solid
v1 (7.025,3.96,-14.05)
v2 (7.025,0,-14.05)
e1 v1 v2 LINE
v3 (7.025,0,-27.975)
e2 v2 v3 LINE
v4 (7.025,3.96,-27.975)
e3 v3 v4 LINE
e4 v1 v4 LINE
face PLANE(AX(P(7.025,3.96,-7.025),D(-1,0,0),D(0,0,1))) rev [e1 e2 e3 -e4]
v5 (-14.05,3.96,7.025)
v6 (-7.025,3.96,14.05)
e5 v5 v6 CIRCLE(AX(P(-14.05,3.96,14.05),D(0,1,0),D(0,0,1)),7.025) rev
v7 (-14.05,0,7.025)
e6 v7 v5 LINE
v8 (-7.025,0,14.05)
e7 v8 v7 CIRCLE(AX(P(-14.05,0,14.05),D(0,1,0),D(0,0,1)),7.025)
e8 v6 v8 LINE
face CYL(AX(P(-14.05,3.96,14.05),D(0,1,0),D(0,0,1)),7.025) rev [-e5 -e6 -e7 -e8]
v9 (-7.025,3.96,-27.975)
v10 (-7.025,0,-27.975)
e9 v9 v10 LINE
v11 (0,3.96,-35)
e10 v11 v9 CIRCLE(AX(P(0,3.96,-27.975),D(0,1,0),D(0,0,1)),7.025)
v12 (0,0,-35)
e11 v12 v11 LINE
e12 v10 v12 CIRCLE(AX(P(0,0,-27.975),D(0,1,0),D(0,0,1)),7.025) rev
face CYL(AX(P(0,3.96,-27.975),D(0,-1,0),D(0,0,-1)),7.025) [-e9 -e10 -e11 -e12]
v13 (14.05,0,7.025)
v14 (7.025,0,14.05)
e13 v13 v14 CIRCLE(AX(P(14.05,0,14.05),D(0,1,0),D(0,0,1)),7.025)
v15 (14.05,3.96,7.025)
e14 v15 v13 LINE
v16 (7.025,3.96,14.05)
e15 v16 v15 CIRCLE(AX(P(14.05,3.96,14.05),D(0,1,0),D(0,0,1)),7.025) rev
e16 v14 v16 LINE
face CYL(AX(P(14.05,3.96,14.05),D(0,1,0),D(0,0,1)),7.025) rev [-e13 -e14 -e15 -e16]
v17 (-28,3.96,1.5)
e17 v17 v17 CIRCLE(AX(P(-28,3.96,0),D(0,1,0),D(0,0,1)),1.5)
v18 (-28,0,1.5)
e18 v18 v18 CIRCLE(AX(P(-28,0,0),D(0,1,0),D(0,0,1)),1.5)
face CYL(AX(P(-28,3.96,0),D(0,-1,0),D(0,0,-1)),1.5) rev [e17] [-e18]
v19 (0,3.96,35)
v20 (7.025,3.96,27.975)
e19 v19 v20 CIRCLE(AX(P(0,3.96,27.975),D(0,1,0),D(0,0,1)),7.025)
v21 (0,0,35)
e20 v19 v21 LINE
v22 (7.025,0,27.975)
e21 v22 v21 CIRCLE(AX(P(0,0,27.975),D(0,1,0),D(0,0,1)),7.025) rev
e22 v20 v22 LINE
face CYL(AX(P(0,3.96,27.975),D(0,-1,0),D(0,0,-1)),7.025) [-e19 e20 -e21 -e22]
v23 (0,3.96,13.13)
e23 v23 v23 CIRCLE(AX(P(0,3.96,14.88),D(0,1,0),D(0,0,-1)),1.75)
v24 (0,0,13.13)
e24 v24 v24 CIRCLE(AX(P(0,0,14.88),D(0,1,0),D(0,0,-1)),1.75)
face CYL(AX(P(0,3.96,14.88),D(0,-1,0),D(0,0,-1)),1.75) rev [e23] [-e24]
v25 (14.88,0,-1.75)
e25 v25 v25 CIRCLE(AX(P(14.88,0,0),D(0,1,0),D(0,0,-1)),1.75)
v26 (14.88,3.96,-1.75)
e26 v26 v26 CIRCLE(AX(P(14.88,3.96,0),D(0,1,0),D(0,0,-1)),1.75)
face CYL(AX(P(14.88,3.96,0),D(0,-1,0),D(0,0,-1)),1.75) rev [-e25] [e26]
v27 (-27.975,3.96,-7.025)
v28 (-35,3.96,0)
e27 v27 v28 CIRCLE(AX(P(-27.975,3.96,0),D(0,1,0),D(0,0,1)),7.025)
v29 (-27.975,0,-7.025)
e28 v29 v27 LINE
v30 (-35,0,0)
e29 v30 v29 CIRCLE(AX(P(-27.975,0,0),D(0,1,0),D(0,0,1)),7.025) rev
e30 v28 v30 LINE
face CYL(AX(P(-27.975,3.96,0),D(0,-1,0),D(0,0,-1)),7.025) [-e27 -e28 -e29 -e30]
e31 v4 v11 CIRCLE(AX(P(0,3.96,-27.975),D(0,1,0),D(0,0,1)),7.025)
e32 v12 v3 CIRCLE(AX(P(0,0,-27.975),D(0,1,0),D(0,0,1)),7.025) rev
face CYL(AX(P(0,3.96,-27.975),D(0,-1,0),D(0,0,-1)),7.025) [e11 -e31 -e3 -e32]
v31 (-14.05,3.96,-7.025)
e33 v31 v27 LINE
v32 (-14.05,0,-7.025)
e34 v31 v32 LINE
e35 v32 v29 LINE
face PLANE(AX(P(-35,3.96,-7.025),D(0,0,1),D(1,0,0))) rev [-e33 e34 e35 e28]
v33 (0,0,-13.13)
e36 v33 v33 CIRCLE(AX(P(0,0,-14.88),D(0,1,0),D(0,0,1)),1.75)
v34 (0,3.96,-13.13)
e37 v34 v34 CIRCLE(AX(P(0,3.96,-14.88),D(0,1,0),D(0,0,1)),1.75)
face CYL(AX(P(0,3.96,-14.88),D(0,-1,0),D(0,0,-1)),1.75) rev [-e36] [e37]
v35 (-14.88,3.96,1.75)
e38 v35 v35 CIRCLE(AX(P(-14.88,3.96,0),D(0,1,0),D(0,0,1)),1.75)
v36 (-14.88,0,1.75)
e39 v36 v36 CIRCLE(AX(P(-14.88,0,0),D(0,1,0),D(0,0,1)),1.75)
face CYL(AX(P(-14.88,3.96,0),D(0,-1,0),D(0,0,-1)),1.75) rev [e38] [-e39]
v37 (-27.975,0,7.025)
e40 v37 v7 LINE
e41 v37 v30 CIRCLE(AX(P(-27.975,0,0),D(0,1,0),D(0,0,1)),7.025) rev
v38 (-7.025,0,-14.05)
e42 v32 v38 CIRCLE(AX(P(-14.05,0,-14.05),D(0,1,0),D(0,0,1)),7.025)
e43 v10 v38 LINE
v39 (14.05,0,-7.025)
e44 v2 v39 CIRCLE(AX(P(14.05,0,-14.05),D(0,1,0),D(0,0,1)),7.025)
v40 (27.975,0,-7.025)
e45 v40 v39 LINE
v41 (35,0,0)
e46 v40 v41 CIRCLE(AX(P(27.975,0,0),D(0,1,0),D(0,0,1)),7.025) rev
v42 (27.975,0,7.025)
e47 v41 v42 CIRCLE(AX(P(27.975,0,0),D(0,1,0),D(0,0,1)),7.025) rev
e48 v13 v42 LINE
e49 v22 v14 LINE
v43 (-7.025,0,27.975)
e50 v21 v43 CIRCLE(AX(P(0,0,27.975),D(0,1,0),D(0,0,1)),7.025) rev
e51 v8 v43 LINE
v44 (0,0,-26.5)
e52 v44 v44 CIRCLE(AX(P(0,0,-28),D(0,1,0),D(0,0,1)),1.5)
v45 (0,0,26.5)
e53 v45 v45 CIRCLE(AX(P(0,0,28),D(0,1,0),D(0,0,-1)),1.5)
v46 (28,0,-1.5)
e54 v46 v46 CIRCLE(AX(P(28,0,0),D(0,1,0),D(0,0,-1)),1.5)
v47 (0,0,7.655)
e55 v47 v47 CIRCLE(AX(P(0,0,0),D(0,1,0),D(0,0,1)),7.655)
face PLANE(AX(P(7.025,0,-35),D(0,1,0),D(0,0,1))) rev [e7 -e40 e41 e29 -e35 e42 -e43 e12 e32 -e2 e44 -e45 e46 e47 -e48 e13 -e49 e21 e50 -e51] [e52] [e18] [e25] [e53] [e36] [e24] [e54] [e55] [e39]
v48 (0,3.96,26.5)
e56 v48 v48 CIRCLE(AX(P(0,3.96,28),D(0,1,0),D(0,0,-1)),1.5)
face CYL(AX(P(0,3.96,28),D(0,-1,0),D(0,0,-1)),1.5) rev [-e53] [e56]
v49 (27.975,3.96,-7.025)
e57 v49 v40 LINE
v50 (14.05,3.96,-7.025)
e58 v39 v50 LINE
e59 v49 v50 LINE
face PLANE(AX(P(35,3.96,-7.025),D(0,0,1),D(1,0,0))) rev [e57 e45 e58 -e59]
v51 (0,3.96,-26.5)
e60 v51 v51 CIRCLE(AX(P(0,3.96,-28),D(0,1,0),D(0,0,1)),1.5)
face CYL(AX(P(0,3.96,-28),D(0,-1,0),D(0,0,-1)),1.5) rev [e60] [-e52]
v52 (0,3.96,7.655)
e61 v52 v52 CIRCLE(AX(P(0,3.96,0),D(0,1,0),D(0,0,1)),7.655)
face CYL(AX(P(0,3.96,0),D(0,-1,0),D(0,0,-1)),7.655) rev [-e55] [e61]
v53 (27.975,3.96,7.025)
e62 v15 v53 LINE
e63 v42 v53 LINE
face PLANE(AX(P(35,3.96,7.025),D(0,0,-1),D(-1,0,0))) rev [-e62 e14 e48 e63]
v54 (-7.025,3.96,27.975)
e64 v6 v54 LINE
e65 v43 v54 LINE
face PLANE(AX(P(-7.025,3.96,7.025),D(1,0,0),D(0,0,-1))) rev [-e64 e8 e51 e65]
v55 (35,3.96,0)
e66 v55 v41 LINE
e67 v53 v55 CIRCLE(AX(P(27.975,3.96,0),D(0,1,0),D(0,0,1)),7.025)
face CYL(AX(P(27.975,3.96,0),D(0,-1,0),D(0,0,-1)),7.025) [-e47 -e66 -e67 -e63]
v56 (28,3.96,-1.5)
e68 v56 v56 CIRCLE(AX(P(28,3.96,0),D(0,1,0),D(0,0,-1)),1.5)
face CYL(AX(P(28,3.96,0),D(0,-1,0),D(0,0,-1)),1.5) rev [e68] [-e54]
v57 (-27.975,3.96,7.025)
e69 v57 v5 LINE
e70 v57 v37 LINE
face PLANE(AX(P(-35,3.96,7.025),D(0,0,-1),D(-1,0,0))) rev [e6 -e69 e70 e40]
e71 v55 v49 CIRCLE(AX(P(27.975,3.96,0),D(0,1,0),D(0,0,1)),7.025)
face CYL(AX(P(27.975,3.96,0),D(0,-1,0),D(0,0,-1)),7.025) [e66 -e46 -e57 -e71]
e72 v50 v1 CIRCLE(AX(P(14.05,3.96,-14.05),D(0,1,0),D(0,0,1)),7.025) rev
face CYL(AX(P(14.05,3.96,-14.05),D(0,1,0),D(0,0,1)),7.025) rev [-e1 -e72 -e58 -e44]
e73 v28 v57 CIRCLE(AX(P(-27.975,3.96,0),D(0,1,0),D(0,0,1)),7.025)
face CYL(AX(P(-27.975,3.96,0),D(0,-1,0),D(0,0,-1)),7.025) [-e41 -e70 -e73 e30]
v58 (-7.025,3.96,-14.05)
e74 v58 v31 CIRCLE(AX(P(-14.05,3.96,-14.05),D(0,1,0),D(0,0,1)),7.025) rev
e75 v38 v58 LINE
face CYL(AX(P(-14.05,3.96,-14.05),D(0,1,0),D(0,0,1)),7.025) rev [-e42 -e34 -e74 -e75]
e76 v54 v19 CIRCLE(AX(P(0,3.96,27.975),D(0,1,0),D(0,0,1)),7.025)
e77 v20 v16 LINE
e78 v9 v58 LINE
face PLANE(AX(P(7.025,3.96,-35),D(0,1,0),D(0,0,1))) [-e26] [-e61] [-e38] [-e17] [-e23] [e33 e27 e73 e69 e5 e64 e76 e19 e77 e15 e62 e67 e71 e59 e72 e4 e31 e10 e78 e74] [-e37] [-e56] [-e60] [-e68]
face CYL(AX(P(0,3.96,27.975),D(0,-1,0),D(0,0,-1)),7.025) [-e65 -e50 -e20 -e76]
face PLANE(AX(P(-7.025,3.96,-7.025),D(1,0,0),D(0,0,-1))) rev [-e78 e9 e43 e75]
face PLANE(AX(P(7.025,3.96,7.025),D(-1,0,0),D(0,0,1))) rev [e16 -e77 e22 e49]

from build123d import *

# Parameters (mm, degrees)
BOSS_EXTRUDE1_DEPTH = 3.96
SKETCH3_R           = 7.655
SKETCH3_R_2         = 1.75
SKETCH3_R_3         = 1.5
CUT_EXTRUDE1_DEPTH  = 50.655630094
FILLET2_R           = 7.025


with BuildPart() as part:
    # Sketch1 → Boss-Extrude1 (new body)
    with BuildSketch(Plane(origin=(0, 0, 0), x_dir=(1, 0, 0), z_dir=(0, 1, 0))):
        Polygon((35, 7.025), (7.025, 7.025), (7.025, 35), (-7.025, 35), (-7.025, 7.025), (-35, 7.025), (-35, -7.025), (-7.025, -7.025), (-7.025, -35), (7.025, -35), (7.025, -7.025), (35, -7.025), align=None)
    extrude(amount=BOSS_EXTRUDE1_DEPTH)

    # Sketch3 → Cut-Extrude1 (cut, through all)
    with BuildSketch(Plane(origin=(0, 0, 0), x_dir=(1, 0, 0), z_dir=(0, 1, 0))):
        with Locations(Location((0, 0, 0), (0, 0, 270))):
            Circle(SKETCH3_R)
        with Locations(Location((-14.88, 0, 0), (0, 0, 270))):
            Circle(SKETCH3_R_2)
        with Locations(Location((-28, 0, 0), (0, 0, 270))):
            Circle(SKETCH3_R_3)
        with Locations(Location((28, 0, 0), (0, 0, 90))):
            Circle(SKETCH3_R_3)
        with Locations(Location((14.88, 0, 0), (0, 0, 90))):
            Circle(SKETCH3_R_2)
        with Locations(Location((0, 14.88, 0), (0, 0, 270))):
            Circle(SKETCH3_R_2)
        with Locations(Location((0, 28, 0), (0, 0, 270))):
            Circle(SKETCH3_R_3)
        with Locations(Location((0, -28, 0), (0, 0, 90))):
            Circle(SKETCH3_R_3)
        with Locations(Location((0, -14.88, 0), (0, 0, 90))):
            Circle(SKETCH3_R_2)
    extrude(amount=CUT_EXTRUDE1_DEPTH, mode=Mode.SUBTRACT)

    # Fillet2
    fillet2_edges = [part.edges().sort_by_distance(p)[0] for p in [
        (7.025, 1.98, 7.025),
        (7.025, 1.98, -7.025),
        (-7.025, 1.98, -7.025),
        (-7.025, 1.98, 7.025),
        (35, 1.98, -7.025),
        (35, 1.98, 7.025),
        (7.025, 1.98, 35),
        (-7.025, 1.98, 35),
        (-35, 1.98, 7.025),
        (-35, 1.98, -7.025),
        (7.025, 1.98, -35),
        (-7.025, 1.98, -35),
    ]]
    fillet(fillet2_edges, radius=FILLET2_R - 0.0001)  # a hair under: the kernel refuses the full size


solid = part.part
